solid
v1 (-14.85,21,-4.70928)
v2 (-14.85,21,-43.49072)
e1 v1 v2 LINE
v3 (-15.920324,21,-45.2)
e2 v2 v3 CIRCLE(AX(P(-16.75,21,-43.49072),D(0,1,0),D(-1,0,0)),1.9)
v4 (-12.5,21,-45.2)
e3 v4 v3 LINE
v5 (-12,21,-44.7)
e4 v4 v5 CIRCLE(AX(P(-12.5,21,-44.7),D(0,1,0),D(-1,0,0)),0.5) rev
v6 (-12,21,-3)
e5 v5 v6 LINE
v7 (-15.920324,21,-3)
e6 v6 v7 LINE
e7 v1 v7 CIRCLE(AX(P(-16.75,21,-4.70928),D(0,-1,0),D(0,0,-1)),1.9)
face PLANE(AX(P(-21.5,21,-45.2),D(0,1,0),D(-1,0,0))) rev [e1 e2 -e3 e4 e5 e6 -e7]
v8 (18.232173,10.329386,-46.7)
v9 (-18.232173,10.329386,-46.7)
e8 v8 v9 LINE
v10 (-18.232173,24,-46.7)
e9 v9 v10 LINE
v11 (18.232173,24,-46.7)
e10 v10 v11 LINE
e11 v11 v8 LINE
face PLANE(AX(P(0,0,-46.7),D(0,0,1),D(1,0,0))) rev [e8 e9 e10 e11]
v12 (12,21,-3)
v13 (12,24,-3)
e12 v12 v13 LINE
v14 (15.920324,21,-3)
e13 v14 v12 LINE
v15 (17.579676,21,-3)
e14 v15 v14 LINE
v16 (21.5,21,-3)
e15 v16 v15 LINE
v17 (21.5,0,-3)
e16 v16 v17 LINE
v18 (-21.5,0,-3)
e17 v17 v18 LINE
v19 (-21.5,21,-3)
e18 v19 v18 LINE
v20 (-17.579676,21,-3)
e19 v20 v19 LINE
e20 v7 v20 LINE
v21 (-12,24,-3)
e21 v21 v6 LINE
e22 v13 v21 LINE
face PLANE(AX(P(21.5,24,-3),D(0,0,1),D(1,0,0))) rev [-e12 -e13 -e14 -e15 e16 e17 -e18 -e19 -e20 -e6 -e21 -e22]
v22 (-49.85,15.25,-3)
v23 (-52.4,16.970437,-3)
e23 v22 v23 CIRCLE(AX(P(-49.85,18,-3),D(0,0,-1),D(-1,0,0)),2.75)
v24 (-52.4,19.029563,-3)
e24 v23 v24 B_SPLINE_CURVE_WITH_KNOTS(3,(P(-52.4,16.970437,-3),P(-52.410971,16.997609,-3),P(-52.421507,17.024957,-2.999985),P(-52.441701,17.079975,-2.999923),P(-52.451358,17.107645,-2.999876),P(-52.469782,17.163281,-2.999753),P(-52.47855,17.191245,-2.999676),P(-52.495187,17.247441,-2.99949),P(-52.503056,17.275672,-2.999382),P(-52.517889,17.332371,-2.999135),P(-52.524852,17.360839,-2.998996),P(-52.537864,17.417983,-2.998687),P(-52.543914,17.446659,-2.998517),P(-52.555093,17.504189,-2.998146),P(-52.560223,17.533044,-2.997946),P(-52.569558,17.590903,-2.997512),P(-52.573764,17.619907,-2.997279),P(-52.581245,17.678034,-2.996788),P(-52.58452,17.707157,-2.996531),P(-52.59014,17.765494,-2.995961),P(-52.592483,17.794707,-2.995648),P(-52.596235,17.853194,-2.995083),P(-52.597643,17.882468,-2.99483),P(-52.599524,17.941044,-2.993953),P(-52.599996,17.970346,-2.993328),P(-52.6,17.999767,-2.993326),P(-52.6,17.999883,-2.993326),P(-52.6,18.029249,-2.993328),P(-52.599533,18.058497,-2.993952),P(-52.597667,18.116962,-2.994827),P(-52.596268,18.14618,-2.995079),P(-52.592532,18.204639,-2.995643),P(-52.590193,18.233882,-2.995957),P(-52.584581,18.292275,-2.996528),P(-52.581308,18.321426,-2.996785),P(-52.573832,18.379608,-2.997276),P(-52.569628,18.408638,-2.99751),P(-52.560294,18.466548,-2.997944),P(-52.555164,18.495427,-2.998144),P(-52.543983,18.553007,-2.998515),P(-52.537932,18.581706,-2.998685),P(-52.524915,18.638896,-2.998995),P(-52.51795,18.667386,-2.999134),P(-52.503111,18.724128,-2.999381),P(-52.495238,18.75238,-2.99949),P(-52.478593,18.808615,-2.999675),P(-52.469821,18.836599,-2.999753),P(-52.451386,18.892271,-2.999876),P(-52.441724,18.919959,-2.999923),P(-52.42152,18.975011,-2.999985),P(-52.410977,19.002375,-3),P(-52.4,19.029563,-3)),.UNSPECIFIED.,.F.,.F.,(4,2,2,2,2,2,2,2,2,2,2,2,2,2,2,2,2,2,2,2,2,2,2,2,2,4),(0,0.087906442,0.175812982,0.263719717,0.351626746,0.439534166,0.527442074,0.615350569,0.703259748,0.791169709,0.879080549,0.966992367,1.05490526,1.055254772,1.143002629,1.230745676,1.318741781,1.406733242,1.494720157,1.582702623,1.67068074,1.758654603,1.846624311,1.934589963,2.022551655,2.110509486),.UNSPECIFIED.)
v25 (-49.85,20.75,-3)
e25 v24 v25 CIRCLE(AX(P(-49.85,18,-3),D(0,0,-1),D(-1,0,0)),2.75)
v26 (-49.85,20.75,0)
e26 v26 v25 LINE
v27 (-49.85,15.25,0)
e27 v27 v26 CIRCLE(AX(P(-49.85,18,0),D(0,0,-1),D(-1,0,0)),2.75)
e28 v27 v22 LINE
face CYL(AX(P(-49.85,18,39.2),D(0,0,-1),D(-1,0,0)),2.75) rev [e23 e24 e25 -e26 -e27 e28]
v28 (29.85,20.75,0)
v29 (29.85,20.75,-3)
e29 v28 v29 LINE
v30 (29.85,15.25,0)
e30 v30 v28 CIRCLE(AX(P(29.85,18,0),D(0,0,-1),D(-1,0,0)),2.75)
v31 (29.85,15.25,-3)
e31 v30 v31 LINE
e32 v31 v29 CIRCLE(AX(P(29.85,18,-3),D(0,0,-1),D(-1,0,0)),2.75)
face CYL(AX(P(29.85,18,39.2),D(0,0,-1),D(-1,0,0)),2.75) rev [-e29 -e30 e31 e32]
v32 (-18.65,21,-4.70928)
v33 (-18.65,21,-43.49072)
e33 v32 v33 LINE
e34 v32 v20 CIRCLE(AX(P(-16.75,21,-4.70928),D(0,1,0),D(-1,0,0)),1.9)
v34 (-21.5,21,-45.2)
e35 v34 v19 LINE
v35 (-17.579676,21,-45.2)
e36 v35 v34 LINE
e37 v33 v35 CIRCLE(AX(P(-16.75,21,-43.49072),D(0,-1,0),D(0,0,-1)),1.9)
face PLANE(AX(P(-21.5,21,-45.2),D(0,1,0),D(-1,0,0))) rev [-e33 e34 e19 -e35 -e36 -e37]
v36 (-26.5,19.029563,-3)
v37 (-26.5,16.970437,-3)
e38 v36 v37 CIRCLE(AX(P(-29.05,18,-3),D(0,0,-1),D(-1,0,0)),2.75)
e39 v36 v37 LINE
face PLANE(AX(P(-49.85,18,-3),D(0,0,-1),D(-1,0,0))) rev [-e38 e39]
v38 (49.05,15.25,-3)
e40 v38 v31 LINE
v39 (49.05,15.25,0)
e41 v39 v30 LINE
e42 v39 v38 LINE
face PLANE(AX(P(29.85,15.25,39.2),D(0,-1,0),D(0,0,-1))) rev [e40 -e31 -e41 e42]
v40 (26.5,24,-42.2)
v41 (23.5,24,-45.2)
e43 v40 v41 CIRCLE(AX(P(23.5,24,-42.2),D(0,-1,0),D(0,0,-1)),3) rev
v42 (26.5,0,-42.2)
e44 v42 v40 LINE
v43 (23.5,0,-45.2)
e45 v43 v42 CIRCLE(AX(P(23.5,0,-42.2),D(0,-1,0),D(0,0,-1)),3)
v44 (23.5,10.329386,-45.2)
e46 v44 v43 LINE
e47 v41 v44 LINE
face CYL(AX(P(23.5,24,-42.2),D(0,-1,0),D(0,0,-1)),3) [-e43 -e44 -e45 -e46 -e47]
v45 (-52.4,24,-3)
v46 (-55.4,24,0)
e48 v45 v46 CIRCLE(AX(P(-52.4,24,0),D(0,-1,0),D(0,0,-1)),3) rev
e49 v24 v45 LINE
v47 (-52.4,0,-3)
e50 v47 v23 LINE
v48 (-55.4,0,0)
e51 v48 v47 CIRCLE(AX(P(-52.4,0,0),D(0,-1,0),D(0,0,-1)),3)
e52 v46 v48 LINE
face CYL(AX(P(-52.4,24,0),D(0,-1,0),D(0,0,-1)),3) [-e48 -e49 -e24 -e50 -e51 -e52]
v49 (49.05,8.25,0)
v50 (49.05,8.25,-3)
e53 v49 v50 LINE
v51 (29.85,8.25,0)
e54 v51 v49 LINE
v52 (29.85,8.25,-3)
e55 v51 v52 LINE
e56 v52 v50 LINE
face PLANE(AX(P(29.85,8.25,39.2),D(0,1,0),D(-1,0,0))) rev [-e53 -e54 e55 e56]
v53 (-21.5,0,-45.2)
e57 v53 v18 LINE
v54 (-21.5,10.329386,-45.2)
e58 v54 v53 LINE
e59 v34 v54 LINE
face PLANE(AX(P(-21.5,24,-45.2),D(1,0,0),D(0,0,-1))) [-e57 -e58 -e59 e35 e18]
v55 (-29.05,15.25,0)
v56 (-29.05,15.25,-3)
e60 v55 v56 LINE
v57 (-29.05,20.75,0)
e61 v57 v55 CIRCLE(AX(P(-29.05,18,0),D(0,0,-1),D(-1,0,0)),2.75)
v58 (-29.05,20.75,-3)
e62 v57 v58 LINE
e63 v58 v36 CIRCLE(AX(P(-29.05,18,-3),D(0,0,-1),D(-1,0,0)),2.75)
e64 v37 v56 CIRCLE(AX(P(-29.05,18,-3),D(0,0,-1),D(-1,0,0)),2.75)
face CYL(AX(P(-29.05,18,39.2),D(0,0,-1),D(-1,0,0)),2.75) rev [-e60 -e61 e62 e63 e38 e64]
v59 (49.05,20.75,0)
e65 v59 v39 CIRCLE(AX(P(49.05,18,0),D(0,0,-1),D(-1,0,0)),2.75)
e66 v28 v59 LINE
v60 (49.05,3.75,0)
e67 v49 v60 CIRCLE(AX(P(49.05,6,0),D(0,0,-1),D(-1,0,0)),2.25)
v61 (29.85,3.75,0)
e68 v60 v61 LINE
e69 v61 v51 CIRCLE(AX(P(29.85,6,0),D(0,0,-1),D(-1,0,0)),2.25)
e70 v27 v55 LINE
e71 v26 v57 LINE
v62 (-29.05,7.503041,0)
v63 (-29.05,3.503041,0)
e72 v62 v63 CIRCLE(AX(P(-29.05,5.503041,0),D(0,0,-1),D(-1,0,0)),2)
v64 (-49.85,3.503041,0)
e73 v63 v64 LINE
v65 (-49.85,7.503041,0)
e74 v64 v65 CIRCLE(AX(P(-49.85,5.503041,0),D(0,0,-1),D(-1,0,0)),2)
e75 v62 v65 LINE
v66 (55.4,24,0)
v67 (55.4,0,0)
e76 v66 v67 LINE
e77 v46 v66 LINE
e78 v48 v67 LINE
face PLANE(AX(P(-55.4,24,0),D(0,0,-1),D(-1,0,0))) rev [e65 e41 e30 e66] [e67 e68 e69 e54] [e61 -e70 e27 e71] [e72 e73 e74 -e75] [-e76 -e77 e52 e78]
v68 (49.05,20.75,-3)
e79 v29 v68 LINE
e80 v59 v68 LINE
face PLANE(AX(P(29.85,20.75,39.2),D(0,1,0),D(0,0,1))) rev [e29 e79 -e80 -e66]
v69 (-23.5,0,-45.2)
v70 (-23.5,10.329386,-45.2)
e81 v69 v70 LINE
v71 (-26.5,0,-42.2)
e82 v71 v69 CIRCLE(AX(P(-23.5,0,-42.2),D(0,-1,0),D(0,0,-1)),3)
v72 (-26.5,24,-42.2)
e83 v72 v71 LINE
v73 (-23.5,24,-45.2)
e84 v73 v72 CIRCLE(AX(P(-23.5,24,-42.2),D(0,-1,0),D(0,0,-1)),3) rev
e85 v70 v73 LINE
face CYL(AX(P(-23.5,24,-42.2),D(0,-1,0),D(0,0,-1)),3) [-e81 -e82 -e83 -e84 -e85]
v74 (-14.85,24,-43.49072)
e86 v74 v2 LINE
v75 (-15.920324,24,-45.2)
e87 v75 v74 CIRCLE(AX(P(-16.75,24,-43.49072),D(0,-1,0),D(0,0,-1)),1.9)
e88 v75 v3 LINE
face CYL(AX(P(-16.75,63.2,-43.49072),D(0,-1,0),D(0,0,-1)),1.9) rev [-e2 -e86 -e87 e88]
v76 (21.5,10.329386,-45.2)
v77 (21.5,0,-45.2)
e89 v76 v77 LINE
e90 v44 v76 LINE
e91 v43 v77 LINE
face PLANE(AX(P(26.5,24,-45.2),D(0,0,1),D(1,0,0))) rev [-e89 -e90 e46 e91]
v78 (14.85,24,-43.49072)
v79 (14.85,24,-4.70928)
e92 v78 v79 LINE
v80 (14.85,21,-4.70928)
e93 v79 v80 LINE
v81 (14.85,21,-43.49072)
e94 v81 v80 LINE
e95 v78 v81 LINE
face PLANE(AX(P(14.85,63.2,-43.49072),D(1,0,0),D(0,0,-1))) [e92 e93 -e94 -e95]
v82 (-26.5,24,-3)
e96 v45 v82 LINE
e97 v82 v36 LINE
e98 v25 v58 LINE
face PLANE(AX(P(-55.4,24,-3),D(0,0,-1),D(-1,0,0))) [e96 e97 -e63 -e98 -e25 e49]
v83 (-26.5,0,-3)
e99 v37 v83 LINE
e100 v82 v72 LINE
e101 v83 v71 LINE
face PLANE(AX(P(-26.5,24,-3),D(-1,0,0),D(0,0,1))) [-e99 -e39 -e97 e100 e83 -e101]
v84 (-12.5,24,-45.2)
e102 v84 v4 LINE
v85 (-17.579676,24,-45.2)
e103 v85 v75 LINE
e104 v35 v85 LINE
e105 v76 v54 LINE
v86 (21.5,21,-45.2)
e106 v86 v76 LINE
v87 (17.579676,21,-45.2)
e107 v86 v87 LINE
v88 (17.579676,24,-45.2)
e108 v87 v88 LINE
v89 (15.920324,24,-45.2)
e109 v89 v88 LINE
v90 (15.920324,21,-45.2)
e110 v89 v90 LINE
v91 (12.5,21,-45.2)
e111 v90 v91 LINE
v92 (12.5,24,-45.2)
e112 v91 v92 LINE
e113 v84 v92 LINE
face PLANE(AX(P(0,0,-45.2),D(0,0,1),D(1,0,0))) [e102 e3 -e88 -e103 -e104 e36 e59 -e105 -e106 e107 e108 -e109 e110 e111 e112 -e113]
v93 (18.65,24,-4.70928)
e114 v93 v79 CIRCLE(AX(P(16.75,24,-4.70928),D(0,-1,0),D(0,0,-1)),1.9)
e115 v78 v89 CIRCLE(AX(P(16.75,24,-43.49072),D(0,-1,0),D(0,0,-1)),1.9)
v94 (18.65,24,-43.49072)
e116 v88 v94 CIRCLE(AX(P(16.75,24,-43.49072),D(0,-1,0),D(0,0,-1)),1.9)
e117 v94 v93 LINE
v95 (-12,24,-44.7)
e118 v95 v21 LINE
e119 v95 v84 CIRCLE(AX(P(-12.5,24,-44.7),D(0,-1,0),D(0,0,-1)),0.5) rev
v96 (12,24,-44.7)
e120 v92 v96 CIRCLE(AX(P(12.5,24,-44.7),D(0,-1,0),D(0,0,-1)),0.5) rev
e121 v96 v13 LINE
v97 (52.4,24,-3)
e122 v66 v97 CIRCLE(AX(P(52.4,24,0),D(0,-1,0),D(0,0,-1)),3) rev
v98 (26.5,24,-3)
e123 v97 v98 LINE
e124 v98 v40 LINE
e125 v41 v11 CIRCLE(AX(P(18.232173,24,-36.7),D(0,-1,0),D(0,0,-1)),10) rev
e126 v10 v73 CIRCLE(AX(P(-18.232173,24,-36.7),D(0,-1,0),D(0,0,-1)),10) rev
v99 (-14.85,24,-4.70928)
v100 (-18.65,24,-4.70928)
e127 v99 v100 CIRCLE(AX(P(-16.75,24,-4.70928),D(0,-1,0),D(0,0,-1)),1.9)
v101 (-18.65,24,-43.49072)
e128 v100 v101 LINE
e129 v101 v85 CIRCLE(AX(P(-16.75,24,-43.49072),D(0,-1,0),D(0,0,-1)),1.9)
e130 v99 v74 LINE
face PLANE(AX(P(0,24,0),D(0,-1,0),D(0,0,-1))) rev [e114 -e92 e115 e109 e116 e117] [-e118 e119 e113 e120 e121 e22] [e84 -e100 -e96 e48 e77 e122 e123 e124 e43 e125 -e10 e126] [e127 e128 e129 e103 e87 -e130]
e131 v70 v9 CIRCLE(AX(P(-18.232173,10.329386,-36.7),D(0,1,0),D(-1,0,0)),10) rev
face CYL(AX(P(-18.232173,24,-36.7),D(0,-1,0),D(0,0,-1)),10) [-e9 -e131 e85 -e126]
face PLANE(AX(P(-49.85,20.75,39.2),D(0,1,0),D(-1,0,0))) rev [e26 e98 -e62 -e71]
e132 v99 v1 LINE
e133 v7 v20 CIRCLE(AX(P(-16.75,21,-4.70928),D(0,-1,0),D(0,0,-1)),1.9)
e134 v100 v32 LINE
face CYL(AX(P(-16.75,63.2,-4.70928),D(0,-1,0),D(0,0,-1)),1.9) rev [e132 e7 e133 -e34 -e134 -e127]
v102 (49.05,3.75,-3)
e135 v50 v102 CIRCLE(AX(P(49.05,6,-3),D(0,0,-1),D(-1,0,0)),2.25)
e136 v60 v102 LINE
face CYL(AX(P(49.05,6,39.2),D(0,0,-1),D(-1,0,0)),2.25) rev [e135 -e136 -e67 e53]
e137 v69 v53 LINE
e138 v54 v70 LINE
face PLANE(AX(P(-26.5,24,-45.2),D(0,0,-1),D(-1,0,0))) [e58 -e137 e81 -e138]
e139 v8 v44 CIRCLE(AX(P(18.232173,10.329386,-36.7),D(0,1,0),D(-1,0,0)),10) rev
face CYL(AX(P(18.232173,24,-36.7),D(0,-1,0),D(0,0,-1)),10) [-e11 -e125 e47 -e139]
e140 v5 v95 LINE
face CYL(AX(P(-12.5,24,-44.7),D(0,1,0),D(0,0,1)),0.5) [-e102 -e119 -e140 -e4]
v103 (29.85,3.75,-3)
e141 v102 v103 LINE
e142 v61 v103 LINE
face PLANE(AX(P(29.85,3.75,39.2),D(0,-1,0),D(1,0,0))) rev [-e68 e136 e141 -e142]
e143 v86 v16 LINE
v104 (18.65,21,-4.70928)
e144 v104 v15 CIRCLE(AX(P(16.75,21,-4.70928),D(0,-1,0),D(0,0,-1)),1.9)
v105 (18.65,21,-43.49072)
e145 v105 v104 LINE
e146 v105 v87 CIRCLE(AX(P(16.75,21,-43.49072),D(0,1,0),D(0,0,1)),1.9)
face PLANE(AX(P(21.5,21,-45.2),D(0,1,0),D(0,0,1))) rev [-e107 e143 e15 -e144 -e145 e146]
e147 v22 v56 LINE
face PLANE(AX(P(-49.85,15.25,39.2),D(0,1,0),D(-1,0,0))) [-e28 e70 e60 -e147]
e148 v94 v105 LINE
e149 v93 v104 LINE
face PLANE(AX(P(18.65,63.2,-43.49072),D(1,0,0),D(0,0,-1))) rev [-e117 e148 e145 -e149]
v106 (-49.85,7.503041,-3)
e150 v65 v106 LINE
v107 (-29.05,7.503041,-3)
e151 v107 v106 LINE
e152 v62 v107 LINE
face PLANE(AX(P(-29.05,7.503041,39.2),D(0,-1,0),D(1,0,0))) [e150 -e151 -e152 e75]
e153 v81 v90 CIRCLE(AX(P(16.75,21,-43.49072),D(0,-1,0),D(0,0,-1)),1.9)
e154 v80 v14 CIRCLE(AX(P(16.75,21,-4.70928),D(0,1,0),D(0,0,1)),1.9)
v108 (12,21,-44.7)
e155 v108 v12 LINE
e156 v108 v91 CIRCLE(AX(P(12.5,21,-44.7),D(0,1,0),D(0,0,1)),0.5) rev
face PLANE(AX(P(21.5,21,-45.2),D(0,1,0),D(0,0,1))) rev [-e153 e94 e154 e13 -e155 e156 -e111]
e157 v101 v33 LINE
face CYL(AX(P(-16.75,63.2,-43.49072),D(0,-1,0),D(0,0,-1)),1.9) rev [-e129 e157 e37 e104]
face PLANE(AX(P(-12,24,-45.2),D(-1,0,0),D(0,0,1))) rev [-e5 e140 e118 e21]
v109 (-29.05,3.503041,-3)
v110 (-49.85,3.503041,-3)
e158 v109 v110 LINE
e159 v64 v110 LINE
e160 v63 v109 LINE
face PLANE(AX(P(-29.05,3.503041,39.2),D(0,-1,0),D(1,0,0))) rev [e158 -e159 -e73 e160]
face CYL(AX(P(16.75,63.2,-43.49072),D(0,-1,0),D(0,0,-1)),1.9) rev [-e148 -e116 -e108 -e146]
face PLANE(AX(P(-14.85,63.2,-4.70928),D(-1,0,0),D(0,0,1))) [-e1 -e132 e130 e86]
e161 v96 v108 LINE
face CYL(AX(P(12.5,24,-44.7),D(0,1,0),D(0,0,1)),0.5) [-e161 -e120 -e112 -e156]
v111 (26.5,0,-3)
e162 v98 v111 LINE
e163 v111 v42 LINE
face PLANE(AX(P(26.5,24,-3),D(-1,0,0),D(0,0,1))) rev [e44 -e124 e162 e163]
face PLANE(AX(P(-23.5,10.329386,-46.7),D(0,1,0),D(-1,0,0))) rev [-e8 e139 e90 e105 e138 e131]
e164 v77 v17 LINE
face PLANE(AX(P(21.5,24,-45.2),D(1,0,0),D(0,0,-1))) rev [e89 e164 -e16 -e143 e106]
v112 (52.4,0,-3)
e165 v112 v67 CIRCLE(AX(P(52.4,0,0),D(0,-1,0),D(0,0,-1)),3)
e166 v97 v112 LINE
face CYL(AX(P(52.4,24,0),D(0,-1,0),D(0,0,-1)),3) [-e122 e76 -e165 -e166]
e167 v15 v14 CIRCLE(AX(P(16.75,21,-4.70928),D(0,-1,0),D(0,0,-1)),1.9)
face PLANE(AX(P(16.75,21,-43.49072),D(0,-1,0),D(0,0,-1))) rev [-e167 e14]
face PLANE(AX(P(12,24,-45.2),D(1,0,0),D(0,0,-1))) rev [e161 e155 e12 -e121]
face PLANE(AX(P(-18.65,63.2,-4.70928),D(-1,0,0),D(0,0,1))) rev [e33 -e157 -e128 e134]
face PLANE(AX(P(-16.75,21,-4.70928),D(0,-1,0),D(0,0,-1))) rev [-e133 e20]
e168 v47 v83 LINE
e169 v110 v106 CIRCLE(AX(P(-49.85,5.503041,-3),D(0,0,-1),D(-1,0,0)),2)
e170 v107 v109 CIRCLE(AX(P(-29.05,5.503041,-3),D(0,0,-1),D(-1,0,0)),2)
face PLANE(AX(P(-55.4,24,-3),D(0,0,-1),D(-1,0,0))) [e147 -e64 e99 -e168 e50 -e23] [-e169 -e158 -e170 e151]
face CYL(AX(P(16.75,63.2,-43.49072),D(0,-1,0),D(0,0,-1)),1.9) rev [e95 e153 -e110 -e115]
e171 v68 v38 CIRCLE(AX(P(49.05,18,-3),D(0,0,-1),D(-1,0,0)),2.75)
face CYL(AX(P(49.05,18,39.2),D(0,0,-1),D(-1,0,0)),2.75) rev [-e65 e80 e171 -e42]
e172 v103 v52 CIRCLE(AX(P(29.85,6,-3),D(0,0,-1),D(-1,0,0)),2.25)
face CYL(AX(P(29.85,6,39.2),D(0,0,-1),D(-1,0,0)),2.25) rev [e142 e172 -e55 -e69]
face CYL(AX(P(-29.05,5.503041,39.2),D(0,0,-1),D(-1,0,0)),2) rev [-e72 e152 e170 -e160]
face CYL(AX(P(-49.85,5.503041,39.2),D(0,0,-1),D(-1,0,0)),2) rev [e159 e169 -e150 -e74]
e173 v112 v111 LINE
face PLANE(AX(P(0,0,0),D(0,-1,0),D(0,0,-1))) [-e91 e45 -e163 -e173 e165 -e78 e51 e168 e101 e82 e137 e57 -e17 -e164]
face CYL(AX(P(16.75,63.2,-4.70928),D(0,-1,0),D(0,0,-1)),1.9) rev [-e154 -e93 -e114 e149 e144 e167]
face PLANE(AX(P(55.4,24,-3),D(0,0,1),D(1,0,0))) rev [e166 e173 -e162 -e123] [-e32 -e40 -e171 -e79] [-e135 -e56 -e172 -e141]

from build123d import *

# Parameters (mm, degrees)
BOSS_EXTRUDE5_DEPTH = 24
SKETCH3_W           = 9.5
SKETCH3_H           = 3
BOSS_EXTRUDE7_DEPTH = 42.2
CUT_EXTRUDE3_DEPTH  = 42.2
CUT_EXTRUDE4_DEPTH  = 42.2
FILLET1_R           = 3
FILLET2_R           = 3
FILLET3_R           = 0.5
FILLET4_R           = 0.5
FILLET5_R           = 3
FILLET6_R           = 3
CUT_EXTRUDE5_DEPTH  = 42.2
CUT_EXTRUDE6_DEPTH  = 42.2
CUT_EXTRUDE7_DEPTH  = 42.2
SKETCH8_W           = 47
SKETCH8_H           = 13.670613598
BOSS_EXTRUDE8_DEPTH = 1.5
FILLET7_R           = 10


# Some blends are built 0.0001 mm under size
with BuildPart() as part:
    # Sketch1 → Boss-Extrude5 (new body)
    with BuildSketch(Plane(origin=(0, 0, 0), x_dir=(1, 0, 0), z_dir=(0, 1, 0))):
        Polygon((-55.4, 0), (55.4, 0), (55.4, 3), (26.5, 3), (26.5, 45.2), (21.5, 45.2), (21.5, 3), (-21.5, 3), (-21.5, 45.2), (-26.5, 45.2), (-26.5, 3), (-55.4, 3), align=None)
    extrude(amount=BOSS_EXTRUDE5_DEPTH)

    # Sketch3 → Boss-Extrude7 (add)
    with BuildSketch(Plane(origin=(0, 0, -3), x_dir=(-1, 0, 0), z_dir=(0, 0, -1))):
        with Locations((-16.75, 22.5)):
            Rectangle(SKETCH3_W, SKETCH3_H)
        with Locations((16.75, 22.5)):
            Rectangle(SKETCH3_W, SKETCH3_H)
    extrude(amount=BOSS_EXTRUDE7_DEPTH)

    # Sketch5 → Cut-Extrude3 (cut)
    with BuildSketch(Plane(origin=(0, 21, 0), x_dir=(-1, 0, 0), z_dir=(0, -1, 0))):
        with BuildLine():
            Line((-14.85, 43.490720045), (-14.85, 4.709279955))
            ThreePointArc((-14.85, 4.709279955), (-16.75, 2.809279955), (-18.65, 4.709279955))
            Line((-18.65, 4.709279955), (-18.65, 43.490720045))
            ThreePointArc((-18.65, 43.490720045), (-16.75, 45.390720045), (-14.85, 43.490720045))
        make_face()
    extrude(amount=-CUT_EXTRUDE3_DEPTH, mode=Mode.SUBTRACT)

    # Sketch5<4> → Cut-Extrude4 (cut)
    with BuildSketch(Plane(origin=(0, 21, 0), x_dir=(-1, 0, 0), z_dir=(0, -1, 0))):
        with BuildLine():
            Line((14.85, 4.709279955), (14.85, 43.490720045))
            ThreePointArc((14.85, 43.490720045), (16.75, 45.390720045), (18.65, 43.490720045))
            Line((18.65, 43.490720045), (18.65, 4.709279955))
            ThreePointArc((18.65, 4.709279955), (16.75, 2.809279955), (14.85, 4.709279955))
        make_face()
    extrude(amount=-CUT_EXTRUDE4_DEPTH, mode=Mode.SUBTRACT)

    # Fillet1
    fillet1_edges = [part.edges().sort_by_distance(p)[0] for p in [
        (-26.5, 12, -45.2),
    ]]
    fillet(fillet1_edges, radius=FILLET1_R)

    # Fillet2
    fillet2_edges = [part.edges().sort_by_distance(p)[0] for p in [
        (26.5, 12, -45.2),
    ]]
    fillet(fillet2_edges, radius=FILLET2_R)

    # Fillet3
    fillet3_edges = [part.edges().sort_by_distance(p)[0] for p in [
        (-12, 22.5, -45.2),
    ]]
    fillet(fillet3_edges, radius=FILLET3_R)

    # Fillet4
    fillet4_edges = [part.edges().sort_by_distance(p)[0] for p in [
        (12, 22.5, -45.2),
    ]]
    fillet(fillet4_edges, radius=FILLET4_R)

    # Fillet5
    fillet5_edges = [part.edges().sort_by_distance(p)[0] for p in [
        (55.4, 12, -3),
    ]]
    fillet(fillet5_edges, radius=FILLET5_R - 0.0001)  # a hair under: the kernel refuses the full size

    # Fillet6
    fillet6_edges = [part.edges().sort_by_distance(p)[0] for p in [
        (-55.4, 12, -3),
    ]]
    fillet(fillet6_edges, radius=FILLET6_R - 0.0001)  # a hair under: the kernel refuses the full size

    # Sketch6 → Cut-Extrude5 (cut)
    with BuildSketch(Plane(origin=(0, 0, -3), x_dir=(-1, 0, 0), z_dir=(0, 0, -1))):
        with BuildLine():
            Line((-29.85, 15.25), (-49.05, 15.25))
            ThreePointArc((-49.05, 15.25), (-51.8, 18), (-49.05, 20.75))
            Line((-49.05, 20.75), (-29.85, 20.75))
            ThreePointArc((-29.85, 20.75), (-27.1, 18), (-29.85, 15.25))
        make_face()
        with BuildLine():
            Line((-29.85, 3.75), (-49.05, 3.75))
            ThreePointArc((-49.05, 3.75), (-51.3, 6), (-49.05, 8.25))
            Line((-49.05, 8.25), (-29.85, 8.25))
            ThreePointArc((-29.85, 8.25), (-27.6, 6), (-29.85, 3.75))
        make_face()
    extrude(amount=-CUT_EXTRUDE5_DEPTH, mode=Mode.SUBTRACT)

    # Sketch7 → Cut-Extrude6 (cut)
    with BuildSketch(Plane(origin=(0, 0, -3), x_dir=(-1, 0, 0), z_dir=(0, 0, -1))):
        with BuildLine():
            Line((49.85, 15.25), (29.05, 15.25))
            ThreePointArc((29.05, 15.25), (26.3, 18), (29.05, 20.75))
            Line((29.05, 20.75), (49.85, 20.75))
            ThreePointArc((49.85, 20.75), (52.6, 18), (49.85, 15.25))
        make_face()
    extrude(amount=-CUT_EXTRUDE6_DEPTH, mode=Mode.SUBTRACT)

    # Sketch7<3> → Cut-Extrude7 (cut)
    with BuildSketch(Plane(origin=(0, 0, -3), x_dir=(-1, 0, 0), z_dir=(0, 0, -1))):
        with BuildLine():
            Line((29.05, 7.503040911), (49.85, 7.503040911))
            ThreePointArc((49.85, 7.503040911), (51.85, 5.503040911), (49.85, 3.503040911))
            Line((49.85, 3.503040911), (29.05, 3.503040911))
            ThreePointArc((29.05, 3.503040911), (27.05, 5.503040911), (29.05, 7.503040911))
        make_face()
    extrude(amount=-CUT_EXTRUDE7_DEPTH, mode=Mode.SUBTRACT)

    # Sketch8 → Boss-Extrude8 (add)
    with BuildSketch(Plane(origin=(0, 0, -45.2), x_dir=(-1, 0, 0), z_dir=(0, 0, -1))):
        with Locations((0, 17.164693201)):
            Rectangle(SKETCH8_W, SKETCH8_H)
    extrude(amount=BOSS_EXTRUDE8_DEPTH)

    # Fillet7
    # the kernel refuses this fillet: 10 mm, written as the material it takes off along each edge
    with BuildSketch(Plane(origin=(23.5, 37.169567191, -46.7), x_dir=(0, 0, 1), z_dir=(0, -1, 0)), Plane(origin=(-23.5, -2.840180789, -46.7), x_dir=(0, 0, 1), z_dir=(0, 1, 0))) as fillet7_piece_1:
        with BuildLine():
            CenterArc((10, 5.267826876), FILLET7_R, 180, 31.788330617)
            Line((0, 5.267826876), (-0.2, 5.267826876))
            Line((-0.2, 5.267826876), (-0.2, 0))
            Line((-0.2, 0), (0, -0.2))
            ThreePointArc((0, -0.2), (0.75, -0.2), (1.33, -0.105356538))
            Line((1.33, -0.105356538), (1.5, 0))
        make_face()
    extrude(amount=40.00974798, mode=Mode.SUBTRACT)


solid = part.part
